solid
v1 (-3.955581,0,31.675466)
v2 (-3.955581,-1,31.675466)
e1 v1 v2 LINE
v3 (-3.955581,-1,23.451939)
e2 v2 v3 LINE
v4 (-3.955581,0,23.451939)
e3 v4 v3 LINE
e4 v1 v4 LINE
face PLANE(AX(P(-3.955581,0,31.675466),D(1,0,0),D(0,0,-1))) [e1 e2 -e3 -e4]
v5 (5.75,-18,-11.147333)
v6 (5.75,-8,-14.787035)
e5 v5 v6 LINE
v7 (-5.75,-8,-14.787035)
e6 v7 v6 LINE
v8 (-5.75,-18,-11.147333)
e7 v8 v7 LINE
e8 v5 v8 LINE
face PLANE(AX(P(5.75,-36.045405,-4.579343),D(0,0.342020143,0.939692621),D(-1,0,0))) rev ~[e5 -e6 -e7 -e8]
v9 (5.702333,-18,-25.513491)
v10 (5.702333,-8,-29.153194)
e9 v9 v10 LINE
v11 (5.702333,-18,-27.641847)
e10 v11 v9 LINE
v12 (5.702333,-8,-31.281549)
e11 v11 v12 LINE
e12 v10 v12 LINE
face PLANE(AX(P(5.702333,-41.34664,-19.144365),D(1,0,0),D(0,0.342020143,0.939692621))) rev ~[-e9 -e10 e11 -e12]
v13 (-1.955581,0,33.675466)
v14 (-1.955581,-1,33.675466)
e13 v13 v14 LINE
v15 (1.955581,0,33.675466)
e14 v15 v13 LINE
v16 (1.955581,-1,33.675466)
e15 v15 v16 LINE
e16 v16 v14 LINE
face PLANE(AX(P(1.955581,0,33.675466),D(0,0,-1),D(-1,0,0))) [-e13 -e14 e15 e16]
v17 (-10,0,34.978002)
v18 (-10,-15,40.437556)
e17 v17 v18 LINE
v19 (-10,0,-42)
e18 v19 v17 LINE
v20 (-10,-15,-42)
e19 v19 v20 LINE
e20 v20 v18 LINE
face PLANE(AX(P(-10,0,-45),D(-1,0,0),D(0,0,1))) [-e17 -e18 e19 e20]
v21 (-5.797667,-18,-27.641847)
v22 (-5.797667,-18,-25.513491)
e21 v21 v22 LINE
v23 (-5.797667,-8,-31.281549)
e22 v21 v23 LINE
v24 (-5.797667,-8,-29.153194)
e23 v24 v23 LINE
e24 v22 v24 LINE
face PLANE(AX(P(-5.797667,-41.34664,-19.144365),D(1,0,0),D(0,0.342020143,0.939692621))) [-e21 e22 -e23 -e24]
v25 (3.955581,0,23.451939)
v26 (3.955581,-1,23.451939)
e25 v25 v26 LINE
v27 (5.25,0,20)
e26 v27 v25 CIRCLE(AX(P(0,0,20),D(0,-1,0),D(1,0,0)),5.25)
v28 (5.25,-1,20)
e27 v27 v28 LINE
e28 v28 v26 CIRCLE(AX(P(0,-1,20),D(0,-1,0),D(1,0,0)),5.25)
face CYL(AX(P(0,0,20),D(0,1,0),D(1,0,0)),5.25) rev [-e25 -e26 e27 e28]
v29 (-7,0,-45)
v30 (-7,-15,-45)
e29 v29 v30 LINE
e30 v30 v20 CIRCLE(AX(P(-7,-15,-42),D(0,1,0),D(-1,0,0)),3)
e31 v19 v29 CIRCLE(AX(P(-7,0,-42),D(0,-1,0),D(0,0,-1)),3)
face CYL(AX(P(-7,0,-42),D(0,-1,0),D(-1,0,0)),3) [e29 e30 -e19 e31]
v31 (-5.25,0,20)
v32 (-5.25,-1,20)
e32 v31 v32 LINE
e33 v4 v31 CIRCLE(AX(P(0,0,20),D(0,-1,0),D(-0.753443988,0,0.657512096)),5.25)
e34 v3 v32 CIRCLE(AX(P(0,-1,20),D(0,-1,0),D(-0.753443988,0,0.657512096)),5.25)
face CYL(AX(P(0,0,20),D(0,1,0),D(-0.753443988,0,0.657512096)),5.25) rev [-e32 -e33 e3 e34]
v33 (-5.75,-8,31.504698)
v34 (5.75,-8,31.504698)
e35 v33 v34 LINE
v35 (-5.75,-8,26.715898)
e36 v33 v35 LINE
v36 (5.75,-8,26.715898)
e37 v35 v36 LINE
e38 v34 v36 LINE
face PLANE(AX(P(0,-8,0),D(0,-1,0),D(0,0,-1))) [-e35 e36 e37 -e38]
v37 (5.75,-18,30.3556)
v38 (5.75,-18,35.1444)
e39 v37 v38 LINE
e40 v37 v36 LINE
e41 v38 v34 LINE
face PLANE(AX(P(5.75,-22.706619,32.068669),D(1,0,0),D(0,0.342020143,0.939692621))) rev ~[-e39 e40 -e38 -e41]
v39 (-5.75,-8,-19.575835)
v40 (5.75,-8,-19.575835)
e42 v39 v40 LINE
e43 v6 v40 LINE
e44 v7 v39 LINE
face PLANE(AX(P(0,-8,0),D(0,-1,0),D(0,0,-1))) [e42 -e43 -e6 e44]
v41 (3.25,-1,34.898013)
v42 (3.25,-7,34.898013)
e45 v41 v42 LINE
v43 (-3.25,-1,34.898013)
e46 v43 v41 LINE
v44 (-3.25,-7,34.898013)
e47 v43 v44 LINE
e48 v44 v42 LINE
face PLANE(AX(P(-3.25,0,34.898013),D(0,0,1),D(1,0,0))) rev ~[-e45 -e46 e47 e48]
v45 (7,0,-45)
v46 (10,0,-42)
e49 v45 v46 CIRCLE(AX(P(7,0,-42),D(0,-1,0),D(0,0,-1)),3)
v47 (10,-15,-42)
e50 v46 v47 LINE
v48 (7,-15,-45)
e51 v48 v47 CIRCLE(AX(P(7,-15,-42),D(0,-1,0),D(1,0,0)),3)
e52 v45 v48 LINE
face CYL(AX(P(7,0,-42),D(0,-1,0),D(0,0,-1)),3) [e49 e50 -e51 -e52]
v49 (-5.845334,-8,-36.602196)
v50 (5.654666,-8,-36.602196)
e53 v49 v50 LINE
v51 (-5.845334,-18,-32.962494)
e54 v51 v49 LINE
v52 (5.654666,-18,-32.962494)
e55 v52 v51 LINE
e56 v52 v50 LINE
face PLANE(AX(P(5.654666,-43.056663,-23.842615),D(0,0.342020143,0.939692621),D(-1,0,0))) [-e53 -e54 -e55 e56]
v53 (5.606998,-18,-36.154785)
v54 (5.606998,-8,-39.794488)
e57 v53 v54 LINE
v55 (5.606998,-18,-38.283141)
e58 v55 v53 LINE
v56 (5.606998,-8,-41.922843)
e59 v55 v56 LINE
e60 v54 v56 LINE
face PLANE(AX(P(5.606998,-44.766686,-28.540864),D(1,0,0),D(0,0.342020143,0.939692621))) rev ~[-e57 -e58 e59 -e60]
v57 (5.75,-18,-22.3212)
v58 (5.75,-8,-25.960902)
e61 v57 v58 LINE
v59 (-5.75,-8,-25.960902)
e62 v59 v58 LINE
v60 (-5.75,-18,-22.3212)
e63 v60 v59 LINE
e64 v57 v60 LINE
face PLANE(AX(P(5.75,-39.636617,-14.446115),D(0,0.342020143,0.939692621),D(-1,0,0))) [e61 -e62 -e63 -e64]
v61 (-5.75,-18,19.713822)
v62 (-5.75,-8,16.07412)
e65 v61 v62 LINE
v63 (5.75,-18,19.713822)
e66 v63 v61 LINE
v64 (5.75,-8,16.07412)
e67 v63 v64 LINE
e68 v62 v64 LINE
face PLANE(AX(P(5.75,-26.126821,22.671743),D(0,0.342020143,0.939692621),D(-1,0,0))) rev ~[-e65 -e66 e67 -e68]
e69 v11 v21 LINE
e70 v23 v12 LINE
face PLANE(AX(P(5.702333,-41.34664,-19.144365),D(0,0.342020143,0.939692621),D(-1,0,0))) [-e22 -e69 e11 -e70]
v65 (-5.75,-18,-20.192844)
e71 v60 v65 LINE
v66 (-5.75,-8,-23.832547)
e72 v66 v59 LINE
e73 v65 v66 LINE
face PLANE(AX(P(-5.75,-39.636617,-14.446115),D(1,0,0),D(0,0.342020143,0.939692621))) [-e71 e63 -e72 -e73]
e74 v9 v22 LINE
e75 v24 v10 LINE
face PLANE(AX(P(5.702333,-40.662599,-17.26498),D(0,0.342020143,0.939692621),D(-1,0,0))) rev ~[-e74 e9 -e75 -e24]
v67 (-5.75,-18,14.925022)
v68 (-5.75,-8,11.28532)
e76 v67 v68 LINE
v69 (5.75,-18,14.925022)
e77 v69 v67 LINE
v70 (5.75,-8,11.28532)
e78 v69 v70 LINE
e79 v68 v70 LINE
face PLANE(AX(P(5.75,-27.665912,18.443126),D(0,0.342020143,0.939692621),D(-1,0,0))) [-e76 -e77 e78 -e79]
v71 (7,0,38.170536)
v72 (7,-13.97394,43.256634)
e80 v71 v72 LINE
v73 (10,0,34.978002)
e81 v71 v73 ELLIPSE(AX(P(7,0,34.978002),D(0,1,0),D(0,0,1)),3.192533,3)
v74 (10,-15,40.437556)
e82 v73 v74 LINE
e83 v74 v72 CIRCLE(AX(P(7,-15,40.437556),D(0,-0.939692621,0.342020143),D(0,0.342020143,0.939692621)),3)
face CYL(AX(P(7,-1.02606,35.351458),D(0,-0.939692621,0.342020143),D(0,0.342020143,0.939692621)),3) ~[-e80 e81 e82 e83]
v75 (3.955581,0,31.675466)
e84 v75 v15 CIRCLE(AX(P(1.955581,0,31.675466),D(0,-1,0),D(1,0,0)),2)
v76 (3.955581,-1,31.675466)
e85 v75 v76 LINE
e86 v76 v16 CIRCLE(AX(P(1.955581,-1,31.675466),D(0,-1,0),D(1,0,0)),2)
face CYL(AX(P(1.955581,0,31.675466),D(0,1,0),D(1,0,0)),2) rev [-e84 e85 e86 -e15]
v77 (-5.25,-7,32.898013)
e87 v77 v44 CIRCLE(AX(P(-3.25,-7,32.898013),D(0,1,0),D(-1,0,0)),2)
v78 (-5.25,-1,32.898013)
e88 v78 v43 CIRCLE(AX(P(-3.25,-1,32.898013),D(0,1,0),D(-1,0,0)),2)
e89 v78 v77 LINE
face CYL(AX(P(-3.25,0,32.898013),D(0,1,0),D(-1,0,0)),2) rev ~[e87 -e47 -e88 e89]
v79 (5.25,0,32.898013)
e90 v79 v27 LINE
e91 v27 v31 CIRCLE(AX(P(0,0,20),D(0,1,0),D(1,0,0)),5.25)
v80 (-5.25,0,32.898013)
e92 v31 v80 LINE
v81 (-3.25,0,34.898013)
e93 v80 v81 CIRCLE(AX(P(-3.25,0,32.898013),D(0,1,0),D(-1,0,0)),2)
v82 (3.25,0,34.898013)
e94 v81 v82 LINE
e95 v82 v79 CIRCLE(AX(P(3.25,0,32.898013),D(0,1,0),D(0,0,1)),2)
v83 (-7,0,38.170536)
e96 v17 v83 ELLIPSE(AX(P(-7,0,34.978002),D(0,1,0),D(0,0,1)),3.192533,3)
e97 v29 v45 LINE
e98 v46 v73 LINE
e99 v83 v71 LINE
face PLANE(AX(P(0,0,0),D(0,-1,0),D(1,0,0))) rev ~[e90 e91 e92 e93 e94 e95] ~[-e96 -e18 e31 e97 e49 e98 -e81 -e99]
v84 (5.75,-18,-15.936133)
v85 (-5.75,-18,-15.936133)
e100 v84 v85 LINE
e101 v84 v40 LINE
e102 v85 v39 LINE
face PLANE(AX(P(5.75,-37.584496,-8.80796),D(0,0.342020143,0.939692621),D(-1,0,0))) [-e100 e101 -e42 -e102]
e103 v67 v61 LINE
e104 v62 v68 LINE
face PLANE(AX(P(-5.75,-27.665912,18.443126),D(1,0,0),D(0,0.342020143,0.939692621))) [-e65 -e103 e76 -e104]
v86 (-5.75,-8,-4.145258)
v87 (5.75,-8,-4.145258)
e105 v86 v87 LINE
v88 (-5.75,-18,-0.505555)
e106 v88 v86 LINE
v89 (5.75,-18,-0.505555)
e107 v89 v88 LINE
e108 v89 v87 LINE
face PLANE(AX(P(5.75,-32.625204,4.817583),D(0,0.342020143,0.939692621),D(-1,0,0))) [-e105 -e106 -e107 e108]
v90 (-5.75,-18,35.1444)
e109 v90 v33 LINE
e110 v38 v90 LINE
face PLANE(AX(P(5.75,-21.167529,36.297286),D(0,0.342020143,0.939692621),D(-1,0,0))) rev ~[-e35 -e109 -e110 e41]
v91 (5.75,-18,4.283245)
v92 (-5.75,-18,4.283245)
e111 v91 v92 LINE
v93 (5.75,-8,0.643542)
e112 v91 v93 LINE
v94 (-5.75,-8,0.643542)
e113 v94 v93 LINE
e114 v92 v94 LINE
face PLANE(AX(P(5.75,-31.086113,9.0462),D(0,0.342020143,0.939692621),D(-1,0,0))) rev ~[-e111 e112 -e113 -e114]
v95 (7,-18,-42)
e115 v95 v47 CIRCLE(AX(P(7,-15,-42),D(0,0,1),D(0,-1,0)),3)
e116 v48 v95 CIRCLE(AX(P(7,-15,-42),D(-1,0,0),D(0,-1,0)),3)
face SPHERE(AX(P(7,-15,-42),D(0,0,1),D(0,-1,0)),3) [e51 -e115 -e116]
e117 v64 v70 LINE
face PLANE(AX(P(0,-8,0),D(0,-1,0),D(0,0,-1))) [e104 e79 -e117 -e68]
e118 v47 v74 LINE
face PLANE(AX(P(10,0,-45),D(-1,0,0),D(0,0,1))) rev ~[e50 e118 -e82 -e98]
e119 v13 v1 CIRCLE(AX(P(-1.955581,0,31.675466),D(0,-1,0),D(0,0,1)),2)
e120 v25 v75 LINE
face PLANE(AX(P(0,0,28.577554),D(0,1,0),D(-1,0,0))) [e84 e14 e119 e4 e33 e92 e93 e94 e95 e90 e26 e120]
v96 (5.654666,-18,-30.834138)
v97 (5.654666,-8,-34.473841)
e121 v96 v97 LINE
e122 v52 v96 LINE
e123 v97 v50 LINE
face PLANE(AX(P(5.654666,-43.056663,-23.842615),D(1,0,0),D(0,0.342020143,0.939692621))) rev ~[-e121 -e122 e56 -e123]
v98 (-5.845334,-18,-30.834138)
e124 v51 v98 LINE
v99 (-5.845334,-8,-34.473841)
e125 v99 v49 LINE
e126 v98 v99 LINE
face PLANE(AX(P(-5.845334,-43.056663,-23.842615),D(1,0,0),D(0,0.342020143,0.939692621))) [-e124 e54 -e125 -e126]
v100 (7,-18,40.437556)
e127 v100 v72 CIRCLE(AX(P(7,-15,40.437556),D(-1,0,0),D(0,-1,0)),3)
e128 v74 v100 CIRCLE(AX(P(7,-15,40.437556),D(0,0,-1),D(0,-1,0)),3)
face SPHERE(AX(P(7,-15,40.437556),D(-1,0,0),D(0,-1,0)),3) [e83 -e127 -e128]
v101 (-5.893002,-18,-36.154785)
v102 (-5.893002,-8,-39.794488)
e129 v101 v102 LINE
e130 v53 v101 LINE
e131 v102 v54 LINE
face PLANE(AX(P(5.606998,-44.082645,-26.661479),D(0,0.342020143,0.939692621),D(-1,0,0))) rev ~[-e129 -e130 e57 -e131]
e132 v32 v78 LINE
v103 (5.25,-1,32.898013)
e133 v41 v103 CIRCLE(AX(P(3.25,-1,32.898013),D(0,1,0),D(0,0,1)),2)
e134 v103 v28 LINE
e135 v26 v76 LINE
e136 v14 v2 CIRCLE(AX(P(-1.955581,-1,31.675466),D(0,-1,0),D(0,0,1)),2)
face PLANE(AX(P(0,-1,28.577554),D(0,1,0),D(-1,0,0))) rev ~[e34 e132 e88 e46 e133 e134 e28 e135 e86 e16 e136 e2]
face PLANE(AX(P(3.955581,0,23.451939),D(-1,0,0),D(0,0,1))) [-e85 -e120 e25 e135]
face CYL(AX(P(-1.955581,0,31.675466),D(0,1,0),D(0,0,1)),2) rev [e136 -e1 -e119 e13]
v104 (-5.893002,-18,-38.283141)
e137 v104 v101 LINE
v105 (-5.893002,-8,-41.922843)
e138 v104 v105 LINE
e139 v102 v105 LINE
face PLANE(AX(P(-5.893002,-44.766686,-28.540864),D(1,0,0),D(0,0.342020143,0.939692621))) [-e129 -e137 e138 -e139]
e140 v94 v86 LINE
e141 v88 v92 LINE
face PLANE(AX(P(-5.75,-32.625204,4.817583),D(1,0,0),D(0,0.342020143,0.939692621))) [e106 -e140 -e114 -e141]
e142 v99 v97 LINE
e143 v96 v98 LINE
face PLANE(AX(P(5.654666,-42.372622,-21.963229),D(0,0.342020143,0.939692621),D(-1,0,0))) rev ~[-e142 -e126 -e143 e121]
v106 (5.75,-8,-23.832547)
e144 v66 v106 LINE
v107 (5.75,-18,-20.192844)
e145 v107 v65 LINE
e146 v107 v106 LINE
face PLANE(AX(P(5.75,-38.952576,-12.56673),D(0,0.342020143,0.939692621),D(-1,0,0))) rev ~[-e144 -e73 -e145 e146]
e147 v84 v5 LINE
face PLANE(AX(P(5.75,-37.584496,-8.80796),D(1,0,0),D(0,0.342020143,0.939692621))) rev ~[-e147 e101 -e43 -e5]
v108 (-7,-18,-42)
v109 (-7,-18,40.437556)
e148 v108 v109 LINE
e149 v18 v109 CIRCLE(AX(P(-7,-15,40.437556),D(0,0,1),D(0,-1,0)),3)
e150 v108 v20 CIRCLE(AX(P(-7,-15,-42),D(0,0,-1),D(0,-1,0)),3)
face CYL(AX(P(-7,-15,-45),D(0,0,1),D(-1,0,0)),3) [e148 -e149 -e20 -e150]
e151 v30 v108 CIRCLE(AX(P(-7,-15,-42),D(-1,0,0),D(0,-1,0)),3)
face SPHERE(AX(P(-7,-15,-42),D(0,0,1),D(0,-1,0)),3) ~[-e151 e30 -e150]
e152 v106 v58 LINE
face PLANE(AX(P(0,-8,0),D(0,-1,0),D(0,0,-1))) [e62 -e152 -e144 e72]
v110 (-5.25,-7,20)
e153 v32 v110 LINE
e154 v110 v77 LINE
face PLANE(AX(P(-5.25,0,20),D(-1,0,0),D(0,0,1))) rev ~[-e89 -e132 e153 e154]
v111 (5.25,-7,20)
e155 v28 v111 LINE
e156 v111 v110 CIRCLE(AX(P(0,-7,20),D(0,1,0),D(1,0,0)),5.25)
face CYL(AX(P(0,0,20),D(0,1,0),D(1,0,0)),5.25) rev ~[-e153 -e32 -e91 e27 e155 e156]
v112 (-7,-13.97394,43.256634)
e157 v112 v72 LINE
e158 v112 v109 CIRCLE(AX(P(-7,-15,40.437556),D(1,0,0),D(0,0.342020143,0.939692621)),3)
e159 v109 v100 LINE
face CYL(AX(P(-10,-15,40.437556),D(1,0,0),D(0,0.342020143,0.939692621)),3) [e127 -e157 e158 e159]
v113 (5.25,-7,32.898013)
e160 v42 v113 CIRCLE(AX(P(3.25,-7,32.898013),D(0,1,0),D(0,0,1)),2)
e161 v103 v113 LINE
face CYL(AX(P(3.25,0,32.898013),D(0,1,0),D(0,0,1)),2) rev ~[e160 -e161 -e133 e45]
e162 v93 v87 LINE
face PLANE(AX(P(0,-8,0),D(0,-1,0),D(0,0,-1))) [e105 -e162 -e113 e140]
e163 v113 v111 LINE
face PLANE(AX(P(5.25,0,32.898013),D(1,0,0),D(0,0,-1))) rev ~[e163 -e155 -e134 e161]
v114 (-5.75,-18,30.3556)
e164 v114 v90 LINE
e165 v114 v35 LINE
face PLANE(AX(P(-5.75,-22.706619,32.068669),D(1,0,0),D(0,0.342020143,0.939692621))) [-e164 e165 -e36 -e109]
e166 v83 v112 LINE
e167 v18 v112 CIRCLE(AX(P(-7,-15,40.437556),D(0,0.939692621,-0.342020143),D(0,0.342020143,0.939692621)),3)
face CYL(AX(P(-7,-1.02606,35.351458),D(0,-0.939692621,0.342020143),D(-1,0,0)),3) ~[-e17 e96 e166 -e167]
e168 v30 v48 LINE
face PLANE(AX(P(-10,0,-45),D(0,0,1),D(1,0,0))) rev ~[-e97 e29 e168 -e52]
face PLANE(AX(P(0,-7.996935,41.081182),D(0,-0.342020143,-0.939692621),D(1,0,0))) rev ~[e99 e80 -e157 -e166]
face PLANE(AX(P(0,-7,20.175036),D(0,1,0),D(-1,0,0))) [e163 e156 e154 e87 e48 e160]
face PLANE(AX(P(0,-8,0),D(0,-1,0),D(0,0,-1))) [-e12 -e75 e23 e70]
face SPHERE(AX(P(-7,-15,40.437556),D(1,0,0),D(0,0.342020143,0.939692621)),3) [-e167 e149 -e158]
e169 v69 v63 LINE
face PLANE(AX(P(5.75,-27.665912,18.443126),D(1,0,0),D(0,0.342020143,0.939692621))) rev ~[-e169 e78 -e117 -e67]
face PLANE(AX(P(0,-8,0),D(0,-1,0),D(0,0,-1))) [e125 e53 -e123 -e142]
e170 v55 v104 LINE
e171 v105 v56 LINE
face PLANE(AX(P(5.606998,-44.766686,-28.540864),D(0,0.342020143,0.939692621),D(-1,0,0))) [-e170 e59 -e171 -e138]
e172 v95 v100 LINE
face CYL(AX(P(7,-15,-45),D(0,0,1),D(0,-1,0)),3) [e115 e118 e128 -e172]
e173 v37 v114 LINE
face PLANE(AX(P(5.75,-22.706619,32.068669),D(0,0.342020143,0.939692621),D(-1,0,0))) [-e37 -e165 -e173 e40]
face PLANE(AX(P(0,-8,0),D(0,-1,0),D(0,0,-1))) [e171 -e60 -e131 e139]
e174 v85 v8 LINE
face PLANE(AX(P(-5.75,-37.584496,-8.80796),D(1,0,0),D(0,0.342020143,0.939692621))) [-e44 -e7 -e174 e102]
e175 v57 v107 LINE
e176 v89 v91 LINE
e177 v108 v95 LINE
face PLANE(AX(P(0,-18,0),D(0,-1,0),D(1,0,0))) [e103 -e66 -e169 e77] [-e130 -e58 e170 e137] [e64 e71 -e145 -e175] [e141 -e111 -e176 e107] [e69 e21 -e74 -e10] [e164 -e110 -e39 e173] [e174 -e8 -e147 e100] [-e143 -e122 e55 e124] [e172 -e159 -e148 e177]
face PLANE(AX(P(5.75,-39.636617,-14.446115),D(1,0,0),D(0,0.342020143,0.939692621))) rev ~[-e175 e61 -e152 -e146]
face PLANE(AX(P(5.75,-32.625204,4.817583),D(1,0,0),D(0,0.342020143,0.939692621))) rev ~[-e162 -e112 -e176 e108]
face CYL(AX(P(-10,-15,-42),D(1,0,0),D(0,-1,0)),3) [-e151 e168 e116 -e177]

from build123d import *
from build123d import SkipClean  # not in build123d's __all__

# Parameters (mm, degrees)
F0_W      = 20
F0_H      = 90
F1_DEPTH  = 18
F4_W      = 11.5
F4_H      = 4.5
F4_H_2    = 2
F6_REACH  = 51.4753785472
F8_W      = 43.5633249581
F8_H      = 43.13050583
F9_DEPTH  = 16.4
F10_R     = 3
F12_DEPTH = 7
F13_DEPTH = 1


with BuildPart() as f1:
    # F0 (on Front) → F1 (new body)
    with BuildSketch(Plane.XZ):
        Rectangle(F0_W, F0_H)
    extrude(amount=F1_DEPTH)

    f6_end = Plane(origin=(0, -8, 0), x_dir=(0, 0, -1), z_dir=(0, -1, 0))
    # F4 (on face) → F6 (cut, up to a plane its end follows)
    with BuildSketch(Plane(origin=(0, -30.357121206, 11.049088517), x_dir=(-1, 0, 0), z_dir=(0, 0.9396926208, -0.3420201433))):
        with Locations((0, 24.6185707509)):
            Rectangle(F4_W, F4_H)
        with Locations((0, 10.1185707509)):
            Rectangle(F4_W, F4_H)
        with Locations((0, -4.3814292491)):
            Rectangle(F4_W, F4_H)
        with Locations((0, -18.8814292491)):
            Rectangle(F4_W, F4_H)
        with Locations((0, -26.1314292491)):
            Rectangle(F4_W, F4_H_2)
        with Locations((0.0476672364, -31.1312020274)):
            Rectangle(F4_W, F4_H_2)
        with Locations((0.0953344728, -36.1309748057)):
            Rectangle(F4_W, F4_H_2)
        with Locations((0.1430017093, -41.130747584)):
            Rectangle(F4_W, F4_H_2)
    f6_long = extrude(amount=F6_REACH, mode=Mode.PRIVATE)
    add(split(f6_long, bisect_by=f6_end, keep=Keep.TOP, mode=Mode.PRIVATE), mode=Mode.SUBTRACT)

    # F8 (on offset) → F9 (cut)
    with BuildSketch(Plane(origin=(0, 12.2677737091, 33.7054312527), x_dir=(1, 0, 0), z_dir=(0, -0.3420201433, -0.9396926208))):
        with Locations((0, 21.565252915)):
            Rectangle(F8_W, F8_H)
    extrude(amount=-F9_DEPTH, mode=Mode.SUBTRACT)

    # F10
    f10_edges = [f1.edges().sort_by_distance(p)[0] for p in [
        (-10, -18, -0.139),
        (0, -18, 44.722),
        (10, -18, -0.139),
        (0, -18, -45),
        (-10, -9, 41.446268),
        (10, -9, 41.446268),
        (-10, -9, -45),
        (10, -9, -45),
    ]]
    fillet(f10_edges, radius=F10_R)

    # F11 (on face) → F12 (cut)
    with BuildSketch(Plane(origin=(0, 0, 0), x_dir=(-1, 0, 0), z_dir=(0, 1, 0))):
        with BuildLine():
            ThreePointArc((-5.25, 20), (0, 14.75), (5.25, 20))
            ThreePointArc((5.25, 20), (4.9157552788, 21.8433258091), (3.9555809377, 23.4519385054))
            ThreePointArc((3.9555809377, 23.4519385054), (0, 25.25), (-3.9555809377, 23.4519385054))
            ThreePointArc((-3.9555809377, 23.4519385054), (-4.9157552788, 21.8433258091), (-5.25, 20))
        make_face()
        with BuildLine():
            ThreePointArc((3.9555809377, 23.4519385054), (4.9157552788, 21.8433258091), (5.25, 20))
            Line((5.25, 20), (5.25, 32.8980128765))
            ThreePointArc((5.25, 32.8980128765), (4.6642135624, 34.3122264389), (3.25, 34.8980128765))
            Line((3.25, 34.8980128765), (-3.25, 34.8980128765))
            ThreePointArc((-3.25, 34.8980128765), (-4.6642135624, 34.3122264389), (-5.25, 32.8980128765))
            Line((-5.25, 32.8980128765), (-5.25, 20))
            ThreePointArc((-5.25, 20), (-4.9157552788, 21.8433258091), (-3.9555809377, 23.4519385054))
            Line((-3.9555809377, 23.4519385054), (-3.9555809377, 31.6754657328))
            ThreePointArc((-3.9555809377, 31.6754657328), (-3.3697945001, 33.0896792952), (-1.9555809377, 33.6754657328))
            Line((-1.9555809377, 33.6754657328), (1.9555809377, 33.6754657328))
            ThreePointArc((1.9555809377, 33.6754657328), (3.3697945001, 33.0896792952), (3.9555809377, 31.6754657328))
            Line((3.9555809377, 31.6754657328), (3.9555809377, 23.4519385054))
        make_face()
        with BuildLine():
            ThreePointArc((-3.9555809377, 23.4519385054), (0, 25.25), (3.9555809377, 23.4519385054))
            Line((3.9555809377, 23.4519385054), (3.9555809377, 31.6754657328))
            ThreePointArc((3.9555809377, 31.6754657328), (3.3697945001, 33.0896792952), (1.9555809377, 33.6754657328))
            Line((1.9555809377, 33.6754657328), (-1.9555809377, 33.6754657328))
            ThreePointArc((-1.9555809377, 33.6754657328), (-3.3697945001, 33.0896792952), (-3.9555809377, 31.6754657328))
            Line((-3.9555809377, 31.6754657328), (-3.9555809377, 23.4519385054))
        make_face()
    extrude(amount=-F12_DEPTH, mode=Mode.SUBTRACT)

    # F11 (on face) → F13 (join)
    with BuildSketch(Plane(origin=(0, 0, 0), x_dir=(-1, 0, 0), z_dir=(0, 1, 0))):
        with BuildLine():
            ThreePointArc((3.9555809377, 23.4519385054), (4.9157552788, 21.8433258091), (5.25, 20))
            Line((5.25, 20), (5.25, 32.8980128765))
            ThreePointArc((5.25, 32.8980128765), (4.6642135624, 34.3122264389), (3.25, 34.8980128765))
            Line((3.25, 34.8980128765), (-3.25, 34.8980128765))
            ThreePointArc((-3.25, 34.8980128765), (-4.6642135624, 34.3122264389), (-5.25, 32.8980128765))
            Line((-5.25, 32.8980128765), (-5.25, 20))
            ThreePointArc((-5.25, 20), (-4.9157552788, 21.8433258091), (-3.9555809377, 23.4519385054))
            Line((-3.9555809377, 23.4519385054), (-3.9555809377, 31.6754657328))
            ThreePointArc((-3.9555809377, 31.6754657328), (-3.3697945001, 33.0896792952), (-1.9555809377, 33.6754657328))
            Line((-1.9555809377, 33.6754657328), (1.9555809377, 33.6754657328))
            ThreePointArc((1.9555809377, 33.6754657328), (3.3697945001, 33.0896792952), (3.9555809377, 31.6754657328))
            Line((3.9555809377, 31.6754657328), (3.9555809377, 23.4519385054))
        make_face()
    with SkipClean():  # cleaning this boolean's faces spoils the solid; the shape is the same uncleaned
        extrude(amount=-F13_DEPTH)


solid = f1.part
